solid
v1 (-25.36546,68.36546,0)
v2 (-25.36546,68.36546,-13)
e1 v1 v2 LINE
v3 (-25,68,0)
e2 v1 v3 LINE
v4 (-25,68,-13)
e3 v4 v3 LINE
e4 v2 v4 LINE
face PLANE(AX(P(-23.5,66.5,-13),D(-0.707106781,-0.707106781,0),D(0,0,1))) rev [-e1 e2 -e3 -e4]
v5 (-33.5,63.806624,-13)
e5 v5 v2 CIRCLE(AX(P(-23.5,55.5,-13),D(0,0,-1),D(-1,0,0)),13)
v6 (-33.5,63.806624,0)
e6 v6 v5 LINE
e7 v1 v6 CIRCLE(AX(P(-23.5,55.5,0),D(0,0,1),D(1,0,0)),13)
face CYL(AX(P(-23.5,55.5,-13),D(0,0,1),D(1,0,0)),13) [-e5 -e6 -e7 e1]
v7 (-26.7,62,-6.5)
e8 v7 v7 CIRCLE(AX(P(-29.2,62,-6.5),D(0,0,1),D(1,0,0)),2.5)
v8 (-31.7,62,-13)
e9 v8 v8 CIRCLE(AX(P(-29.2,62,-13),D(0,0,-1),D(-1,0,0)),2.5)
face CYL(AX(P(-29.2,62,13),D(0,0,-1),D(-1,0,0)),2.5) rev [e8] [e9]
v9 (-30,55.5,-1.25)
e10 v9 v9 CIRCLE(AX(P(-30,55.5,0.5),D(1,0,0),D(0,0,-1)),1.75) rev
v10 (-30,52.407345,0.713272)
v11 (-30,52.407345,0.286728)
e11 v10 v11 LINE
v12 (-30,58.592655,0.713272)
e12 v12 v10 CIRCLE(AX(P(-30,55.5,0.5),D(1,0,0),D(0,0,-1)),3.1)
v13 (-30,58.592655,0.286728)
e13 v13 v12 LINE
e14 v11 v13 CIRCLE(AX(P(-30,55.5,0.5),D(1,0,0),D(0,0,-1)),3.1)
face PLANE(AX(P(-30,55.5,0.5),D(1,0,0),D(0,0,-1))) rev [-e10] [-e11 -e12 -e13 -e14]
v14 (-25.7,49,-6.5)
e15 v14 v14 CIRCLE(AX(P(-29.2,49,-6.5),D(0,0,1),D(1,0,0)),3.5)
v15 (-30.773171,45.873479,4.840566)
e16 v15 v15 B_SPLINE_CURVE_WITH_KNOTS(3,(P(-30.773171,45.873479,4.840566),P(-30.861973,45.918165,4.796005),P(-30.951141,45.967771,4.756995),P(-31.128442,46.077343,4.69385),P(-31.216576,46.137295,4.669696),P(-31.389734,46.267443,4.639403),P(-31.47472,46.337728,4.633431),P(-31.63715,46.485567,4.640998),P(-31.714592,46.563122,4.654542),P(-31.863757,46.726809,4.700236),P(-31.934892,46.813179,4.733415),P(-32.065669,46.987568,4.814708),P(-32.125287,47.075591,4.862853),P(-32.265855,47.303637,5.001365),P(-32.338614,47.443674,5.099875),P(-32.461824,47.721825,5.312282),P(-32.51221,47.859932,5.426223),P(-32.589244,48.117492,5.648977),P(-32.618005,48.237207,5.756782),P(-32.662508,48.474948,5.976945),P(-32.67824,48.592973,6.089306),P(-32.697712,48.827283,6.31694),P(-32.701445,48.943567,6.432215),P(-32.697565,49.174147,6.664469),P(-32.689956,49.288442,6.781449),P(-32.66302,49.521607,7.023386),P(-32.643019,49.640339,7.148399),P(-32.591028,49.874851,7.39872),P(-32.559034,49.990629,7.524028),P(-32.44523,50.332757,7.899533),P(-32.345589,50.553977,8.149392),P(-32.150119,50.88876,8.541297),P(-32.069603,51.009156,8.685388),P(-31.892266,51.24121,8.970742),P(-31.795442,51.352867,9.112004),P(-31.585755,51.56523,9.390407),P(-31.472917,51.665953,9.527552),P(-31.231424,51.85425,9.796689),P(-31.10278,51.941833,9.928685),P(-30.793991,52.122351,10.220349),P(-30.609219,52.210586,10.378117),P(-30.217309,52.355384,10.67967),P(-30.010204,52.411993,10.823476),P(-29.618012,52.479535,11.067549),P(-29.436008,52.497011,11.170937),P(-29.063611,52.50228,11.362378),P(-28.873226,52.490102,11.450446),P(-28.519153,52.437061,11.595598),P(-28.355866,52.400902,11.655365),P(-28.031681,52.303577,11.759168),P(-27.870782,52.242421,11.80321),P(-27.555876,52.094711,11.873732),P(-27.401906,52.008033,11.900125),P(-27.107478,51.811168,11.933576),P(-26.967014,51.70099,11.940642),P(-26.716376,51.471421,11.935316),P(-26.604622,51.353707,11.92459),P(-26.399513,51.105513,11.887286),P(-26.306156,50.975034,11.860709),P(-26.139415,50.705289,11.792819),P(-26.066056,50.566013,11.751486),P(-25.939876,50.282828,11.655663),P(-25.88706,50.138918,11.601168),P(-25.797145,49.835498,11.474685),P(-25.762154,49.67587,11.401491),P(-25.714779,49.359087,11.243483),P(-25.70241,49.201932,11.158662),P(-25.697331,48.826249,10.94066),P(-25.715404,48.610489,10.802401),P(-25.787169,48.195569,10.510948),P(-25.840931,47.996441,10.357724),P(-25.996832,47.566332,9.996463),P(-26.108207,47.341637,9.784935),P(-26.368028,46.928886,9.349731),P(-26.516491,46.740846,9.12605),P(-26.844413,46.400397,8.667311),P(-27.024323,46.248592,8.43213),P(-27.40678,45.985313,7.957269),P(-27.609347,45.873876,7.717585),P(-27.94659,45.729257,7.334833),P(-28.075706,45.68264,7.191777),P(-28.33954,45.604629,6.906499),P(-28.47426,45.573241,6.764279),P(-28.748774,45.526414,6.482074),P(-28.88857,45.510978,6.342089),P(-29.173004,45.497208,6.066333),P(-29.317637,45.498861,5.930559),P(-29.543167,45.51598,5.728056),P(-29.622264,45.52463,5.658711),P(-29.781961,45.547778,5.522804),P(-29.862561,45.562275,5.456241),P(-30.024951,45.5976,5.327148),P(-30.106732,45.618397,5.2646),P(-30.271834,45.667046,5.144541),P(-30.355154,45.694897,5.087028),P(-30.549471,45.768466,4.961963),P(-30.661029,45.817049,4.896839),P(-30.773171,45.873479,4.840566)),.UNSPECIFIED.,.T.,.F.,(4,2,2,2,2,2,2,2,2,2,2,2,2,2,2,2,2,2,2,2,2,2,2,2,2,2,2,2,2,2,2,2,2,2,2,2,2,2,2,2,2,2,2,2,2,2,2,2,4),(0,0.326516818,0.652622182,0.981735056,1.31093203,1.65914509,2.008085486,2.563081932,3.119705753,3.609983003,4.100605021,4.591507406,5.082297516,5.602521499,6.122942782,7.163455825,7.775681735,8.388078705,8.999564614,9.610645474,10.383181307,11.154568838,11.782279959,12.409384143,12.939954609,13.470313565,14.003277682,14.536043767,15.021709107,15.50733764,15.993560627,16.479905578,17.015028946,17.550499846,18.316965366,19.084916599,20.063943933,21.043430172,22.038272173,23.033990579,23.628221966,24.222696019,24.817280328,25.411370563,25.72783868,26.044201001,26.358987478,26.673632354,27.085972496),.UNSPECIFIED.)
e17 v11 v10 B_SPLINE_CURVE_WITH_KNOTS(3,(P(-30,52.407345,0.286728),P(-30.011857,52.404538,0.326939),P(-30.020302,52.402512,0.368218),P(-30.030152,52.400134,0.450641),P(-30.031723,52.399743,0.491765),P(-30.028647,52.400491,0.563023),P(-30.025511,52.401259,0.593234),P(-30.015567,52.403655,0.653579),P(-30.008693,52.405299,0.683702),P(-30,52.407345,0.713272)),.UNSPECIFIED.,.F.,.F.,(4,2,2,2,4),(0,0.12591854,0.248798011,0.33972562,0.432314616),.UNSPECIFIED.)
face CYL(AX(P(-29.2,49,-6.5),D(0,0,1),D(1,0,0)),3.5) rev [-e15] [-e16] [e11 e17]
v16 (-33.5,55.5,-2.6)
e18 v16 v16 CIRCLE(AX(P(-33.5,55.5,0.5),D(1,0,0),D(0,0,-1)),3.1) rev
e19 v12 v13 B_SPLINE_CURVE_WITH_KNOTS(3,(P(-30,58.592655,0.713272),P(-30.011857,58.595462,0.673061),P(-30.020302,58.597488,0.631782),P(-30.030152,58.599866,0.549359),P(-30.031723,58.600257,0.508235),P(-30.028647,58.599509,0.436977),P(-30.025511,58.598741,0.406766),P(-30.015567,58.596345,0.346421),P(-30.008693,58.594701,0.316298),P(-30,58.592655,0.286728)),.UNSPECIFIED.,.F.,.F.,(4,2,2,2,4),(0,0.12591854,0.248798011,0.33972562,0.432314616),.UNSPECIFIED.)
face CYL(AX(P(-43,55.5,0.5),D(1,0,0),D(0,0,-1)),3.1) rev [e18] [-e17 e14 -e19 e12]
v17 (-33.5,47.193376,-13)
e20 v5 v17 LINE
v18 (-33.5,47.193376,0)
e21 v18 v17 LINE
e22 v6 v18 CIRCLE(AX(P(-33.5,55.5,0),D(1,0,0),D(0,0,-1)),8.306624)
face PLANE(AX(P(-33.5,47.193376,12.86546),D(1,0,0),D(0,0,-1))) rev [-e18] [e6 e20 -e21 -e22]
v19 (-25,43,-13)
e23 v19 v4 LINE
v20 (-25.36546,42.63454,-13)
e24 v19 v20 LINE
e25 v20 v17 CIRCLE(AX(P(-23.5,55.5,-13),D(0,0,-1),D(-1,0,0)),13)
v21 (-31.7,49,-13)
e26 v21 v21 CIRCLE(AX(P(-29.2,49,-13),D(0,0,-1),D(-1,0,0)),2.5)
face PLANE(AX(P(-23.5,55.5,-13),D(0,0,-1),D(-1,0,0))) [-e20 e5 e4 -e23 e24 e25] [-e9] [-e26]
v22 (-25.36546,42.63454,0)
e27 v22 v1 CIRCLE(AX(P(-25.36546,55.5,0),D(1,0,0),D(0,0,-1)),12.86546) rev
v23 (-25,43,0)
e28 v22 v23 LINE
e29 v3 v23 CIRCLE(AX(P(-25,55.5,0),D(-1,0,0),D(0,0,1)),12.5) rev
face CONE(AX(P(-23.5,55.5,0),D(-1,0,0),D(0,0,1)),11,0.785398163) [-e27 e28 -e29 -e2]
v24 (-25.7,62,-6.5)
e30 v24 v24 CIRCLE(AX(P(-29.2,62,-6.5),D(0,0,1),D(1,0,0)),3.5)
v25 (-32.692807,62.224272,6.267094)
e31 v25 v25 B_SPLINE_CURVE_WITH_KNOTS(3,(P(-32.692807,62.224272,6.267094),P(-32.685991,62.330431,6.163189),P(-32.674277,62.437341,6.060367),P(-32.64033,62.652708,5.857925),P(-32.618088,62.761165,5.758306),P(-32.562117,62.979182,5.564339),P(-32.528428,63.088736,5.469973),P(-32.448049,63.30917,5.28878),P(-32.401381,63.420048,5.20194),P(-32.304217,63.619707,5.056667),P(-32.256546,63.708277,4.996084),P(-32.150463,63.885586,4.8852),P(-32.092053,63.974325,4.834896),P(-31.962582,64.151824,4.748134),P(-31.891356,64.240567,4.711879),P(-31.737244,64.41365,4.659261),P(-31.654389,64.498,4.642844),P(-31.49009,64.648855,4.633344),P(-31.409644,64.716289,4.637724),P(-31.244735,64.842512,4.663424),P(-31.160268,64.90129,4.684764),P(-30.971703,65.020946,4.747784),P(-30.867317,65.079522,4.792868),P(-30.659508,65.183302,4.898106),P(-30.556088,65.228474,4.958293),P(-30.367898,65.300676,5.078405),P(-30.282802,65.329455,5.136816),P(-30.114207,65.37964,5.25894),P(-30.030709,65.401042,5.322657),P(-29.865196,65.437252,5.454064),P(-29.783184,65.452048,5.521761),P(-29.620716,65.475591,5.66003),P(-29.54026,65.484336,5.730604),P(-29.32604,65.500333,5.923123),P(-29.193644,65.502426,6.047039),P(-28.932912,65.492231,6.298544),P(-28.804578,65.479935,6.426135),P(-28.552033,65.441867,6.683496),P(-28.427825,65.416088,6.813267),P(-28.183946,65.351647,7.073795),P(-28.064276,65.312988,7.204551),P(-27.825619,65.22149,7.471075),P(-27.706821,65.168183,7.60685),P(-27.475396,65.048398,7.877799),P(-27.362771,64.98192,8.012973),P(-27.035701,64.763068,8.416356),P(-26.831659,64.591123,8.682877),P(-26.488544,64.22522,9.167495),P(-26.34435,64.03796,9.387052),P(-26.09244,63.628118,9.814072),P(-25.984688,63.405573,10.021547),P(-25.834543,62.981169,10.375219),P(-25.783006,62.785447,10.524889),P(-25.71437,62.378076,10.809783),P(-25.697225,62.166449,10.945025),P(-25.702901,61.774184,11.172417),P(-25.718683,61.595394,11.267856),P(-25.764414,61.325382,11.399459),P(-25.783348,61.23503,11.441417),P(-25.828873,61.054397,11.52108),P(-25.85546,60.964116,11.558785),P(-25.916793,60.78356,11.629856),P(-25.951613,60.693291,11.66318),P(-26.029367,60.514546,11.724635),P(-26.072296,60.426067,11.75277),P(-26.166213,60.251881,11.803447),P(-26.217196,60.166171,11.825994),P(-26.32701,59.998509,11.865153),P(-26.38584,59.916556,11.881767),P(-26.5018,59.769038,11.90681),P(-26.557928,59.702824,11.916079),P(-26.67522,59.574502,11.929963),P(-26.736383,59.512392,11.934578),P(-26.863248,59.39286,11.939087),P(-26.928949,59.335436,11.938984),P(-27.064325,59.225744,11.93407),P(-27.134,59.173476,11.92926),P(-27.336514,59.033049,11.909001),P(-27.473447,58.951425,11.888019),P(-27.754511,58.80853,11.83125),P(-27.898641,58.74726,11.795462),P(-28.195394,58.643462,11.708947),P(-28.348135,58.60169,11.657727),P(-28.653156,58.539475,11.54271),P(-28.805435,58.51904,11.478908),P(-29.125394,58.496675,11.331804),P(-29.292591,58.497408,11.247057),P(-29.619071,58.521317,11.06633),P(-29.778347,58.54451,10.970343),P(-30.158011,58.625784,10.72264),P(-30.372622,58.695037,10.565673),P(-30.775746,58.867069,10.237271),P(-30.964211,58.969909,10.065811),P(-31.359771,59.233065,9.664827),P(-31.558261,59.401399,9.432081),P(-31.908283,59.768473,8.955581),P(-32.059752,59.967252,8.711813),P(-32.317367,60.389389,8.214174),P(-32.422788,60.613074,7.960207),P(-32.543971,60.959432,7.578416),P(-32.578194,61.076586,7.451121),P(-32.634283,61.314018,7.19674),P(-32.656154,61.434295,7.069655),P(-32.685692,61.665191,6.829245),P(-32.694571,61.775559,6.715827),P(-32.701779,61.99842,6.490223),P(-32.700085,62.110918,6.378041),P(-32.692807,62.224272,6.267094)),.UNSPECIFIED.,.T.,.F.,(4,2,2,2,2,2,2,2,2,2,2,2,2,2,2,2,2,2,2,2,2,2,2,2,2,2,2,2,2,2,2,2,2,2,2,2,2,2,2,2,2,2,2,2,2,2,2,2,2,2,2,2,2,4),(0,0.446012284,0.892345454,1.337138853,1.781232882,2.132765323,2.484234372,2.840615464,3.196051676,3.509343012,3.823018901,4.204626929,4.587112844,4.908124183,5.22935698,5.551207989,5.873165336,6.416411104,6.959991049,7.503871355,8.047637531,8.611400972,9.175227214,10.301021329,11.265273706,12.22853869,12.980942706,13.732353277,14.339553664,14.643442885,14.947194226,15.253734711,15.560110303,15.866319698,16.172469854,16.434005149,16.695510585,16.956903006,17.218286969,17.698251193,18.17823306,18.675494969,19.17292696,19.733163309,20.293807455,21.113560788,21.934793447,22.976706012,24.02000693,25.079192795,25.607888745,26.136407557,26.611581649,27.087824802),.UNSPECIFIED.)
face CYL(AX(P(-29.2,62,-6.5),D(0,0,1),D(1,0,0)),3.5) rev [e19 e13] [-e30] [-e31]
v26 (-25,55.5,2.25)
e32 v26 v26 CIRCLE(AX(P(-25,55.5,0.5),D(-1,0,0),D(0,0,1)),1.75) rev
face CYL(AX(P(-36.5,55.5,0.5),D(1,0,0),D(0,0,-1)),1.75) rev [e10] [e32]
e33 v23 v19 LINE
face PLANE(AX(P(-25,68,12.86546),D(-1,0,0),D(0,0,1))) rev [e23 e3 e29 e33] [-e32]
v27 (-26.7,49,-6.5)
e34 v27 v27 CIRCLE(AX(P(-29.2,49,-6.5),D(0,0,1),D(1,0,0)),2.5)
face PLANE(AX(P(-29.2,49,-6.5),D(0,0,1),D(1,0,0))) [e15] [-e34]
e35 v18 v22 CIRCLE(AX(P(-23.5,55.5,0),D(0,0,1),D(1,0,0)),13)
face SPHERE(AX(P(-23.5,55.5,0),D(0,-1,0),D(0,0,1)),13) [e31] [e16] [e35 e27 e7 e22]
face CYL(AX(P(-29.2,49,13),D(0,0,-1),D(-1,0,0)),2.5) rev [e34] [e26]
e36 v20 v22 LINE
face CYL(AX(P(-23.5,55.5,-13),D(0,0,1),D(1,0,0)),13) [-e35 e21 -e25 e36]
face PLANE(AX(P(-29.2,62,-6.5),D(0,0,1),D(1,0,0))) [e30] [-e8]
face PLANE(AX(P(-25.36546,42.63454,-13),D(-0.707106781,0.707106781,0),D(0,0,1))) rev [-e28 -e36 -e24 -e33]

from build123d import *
from build123d.topology import SkipClean

# Parameters (mm, degrees)
REVOLU_O1_ANGLE            = 90
ESBO_O3_R                  = 2.5
CORTE_EXTRUS_O1_DEPTH      = 79.698792875
RESSALTO_EXTRUS_O1_START   = 13
ESBO_O7_R                  = 2.5
RESSALTO_EXTRUS_O1_DEPTH   = 13
CORTE_EXTRUS_O3_DEPTH      = 79.698792875
CORTE_EXTRUS_O3_DEPTH_BACK = 6.5
ESBO_O4_R                  = 3.5
ESBO_O6_R                  = 1.75
CORTE_EXTRUS_O4_DEPTH      = 71.924255371
CORTE_EXTRUS_O5_START      = -6.5
ESBO_O8_R                  = 3.1
CORTE_EXTRUS_O5_DEPTH      = 13
CHANFRO1_SIZE              = 2
CORTE_EXTRUS_O6_DEPTH      = 82.701335058
CORTE_EXTRUS_O7_DEPTH      = 81.405896153


with BuildPart() as part:
    # Esboço2 → Revolução1 (revolve)
    with BuildSketch(Plane.XY):
        with BuildLine():
            Line((-23.5, 42.5), (-23.5, 68.5))
            ThreePointArc((-23.5, 68.5), (-36.5, 55.5), (-23.5, 42.5))
        make_face()
    revolve(axis=Axis((-23.5, 42.5, 0), (0, 1, 0)), revolution_arc=REVOLU_O1_ANGLE)

    # Esboço3 → Corte-extrusão1 (cut, through all)
    with BuildSketch(Plane.XY):
        with Locations(Location((-29.2, 62, 0), (0, 0, 142.736397609))):
            Circle(ESBO_O3_R)
        with Locations(Location((-29.2, 49, 0), (0, 0, 233.94500715))):
            Circle(ESBO_O3_R)
    extrude(amount=CORTE_EXTRUS_O1_DEPTH, mode=Mode.SUBTRACT)

    # Esboço7 → Ressalto-extrusão1 (add)
    with SkipClean():  # the faces are left unmerged after this step: merging them gives an invalid solid
        with BuildSketch(Plane(origin=(0, 0, 0), x_dir=(-1, 0, 0), z_dir=(0, 0, -1)).offset(RESSALTO_EXTRUS_O1_START)):
            with BuildLine():
                Line((23.5, 68.5), (23.5, 42.5))
                ThreePointArc((23.5, 42.5), (36.5, 55.5), (23.5, 68.5))
            make_face()
            with Locations((29.2, 62)):
                Circle(ESBO_O7_R, mode=Mode.SUBTRACT)
            with Locations((29.2, 49)):
                Circle(ESBO_O7_R, mode=Mode.SUBTRACT)
        extrude(amount=-RESSALTO_EXTRUS_O1_DEPTH)

    # Esboço4 → Corte-extrusão3 (cut, two sides: drawn at the far end of the back side and taken through both)
    with BuildSketch(Plane.XY.offset(-CORTE_EXTRUS_O3_DEPTH_BACK)):
        with Locations((-29.2, 62)):
            Circle(ESBO_O4_R)
        with Locations((-29.2, 49)):
            Circle(ESBO_O4_R)
    extrude(amount=CORTE_EXTRUS_O3_DEPTH + CORTE_EXTRUS_O3_DEPTH_BACK, mode=Mode.SUBTRACT)

    # Esboço6 → Corte-extrusão4 (cut, through all)
    with BuildSketch(Plane(origin=(-23.5, 0, 0), x_dir=(0, 0, -1), z_dir=(1, 0, 0))):
        with Locations((-0.5, 55.5)):
            Circle(ESBO_O6_R)
    extrude(amount=-CORTE_EXTRUS_O4_DEPTH, mode=Mode.SUBTRACT)

    # Esboço8 → Corte-extrusão5 (cut)
    with BuildSketch(Plane(origin=(-23.5, 0, 0), x_dir=(0, 0, -1), z_dir=(1, 0, 0)).offset(CORTE_EXTRUS_O5_START)):
        with Locations(Location((-0.5, 55.5, 0), (0, 0, 279.281799091))):
            Circle(ESBO_O8_R)
    extrude(amount=-CORTE_EXTRUS_O5_DEPTH, mode=Mode.SUBTRACT)

    # Chanfro1
    # the kernel refuses this chamfer: 2 mm, written as the material it takes off along each edge
    with BuildSketch(Plane(origin=(-23.5, 42.5, -18.143365976), x_dir=(-0.9974093352150653, 0.07193481789677074, 0), z_dir=(0, 0, 1))) as chanfro1_piece_1:
        with BuildLine():
            Line((1.870305265, 0), (CHANFRO1_SIZE * 0.0719348178968, -CHANFRO1_SIZE * 0.997409335215))
            Line((CHANFRO1_SIZE * 0.0719348178968, -CHANFRO1_SIZE * 0.997409335215), (0, 0))
            ThreePointArc((0, 0), (0.961335866, 0.033652274), (1.870305265, 0))
        make_face()
    extrude(amount=18.143365976, mode=Mode.SUBTRACT)
    with BuildSketch(Plane(origin=(-23.5, 68.5, -18.143365976), x_dir=(-0.9974093352150653, -0.07193481789677116, 0), z_dir=(0, 0, 1))) as chanfro1_piece_2:
        with BuildLine():
            Line((1.870305265, 0), (CHANFRO1_SIZE * 0.0719348178968, CHANFRO1_SIZE * 0.997409335215))
            Line((CHANFRO1_SIZE * 0.0719348178968, CHANFRO1_SIZE * 0.997409335215), (0, 0))
            ThreePointArc((0, 0), (0.961335866, -0.033652274), (1.870305265, 0))
        make_face()
    extrude(amount=18.143365976, mode=Mode.SUBTRACT)
    with BuildSketch(Plane(origin=(-23.5, 55.5, 0), x_dir=(0, 1, 0), z_dir=(0, 0, -1))) as chanfro1_piece_3:
        with BuildLine():
            Line((12.865459931, -1.865459931), (13 - CHANFRO1_SIZE, 0))
            Line((13 - CHANFRO1_SIZE, 0), (13, 0))
            ThreePointArc((13, 0), (12.964411572, -0.961266138), (12.865459931, -1.865459931))
        make_face()
    revolve(axis=Axis((-23.5, 55.5, 0), (1, 0, 0)), revolution_arc=180, mode=Mode.SUBTRACT)

    # Esboço9 → Corte-extrusão6 (cut, through all)
    with BuildSketch(Plane(origin=(0, 0, -13), x_dir=(-1, 0, 0), z_dir=(0, 0, -1))):
        with BuildLine():
            Line((33.5, 47.193376137), (33.5, 63.806623863))
            ThreePointArc((33.5, 63.806623863), (36.5, 55.5), (33.5, 47.193376137))
        make_face()
    extrude(amount=-CORTE_EXTRUS_O6_DEPTH, mode=Mode.SUBTRACT)

    # Esboço10 → Corte-extrusão7 (cut, through all)
    with BuildSketch(Plane(origin=(0, 0, -13), x_dir=(-1, 0, 0), z_dir=(0, 0, -1))):
        Polygon((25, 68), (25, 43), (23.5, 44.5), (23.5, 66.5), align=None)
    extrude(amount=-CORTE_EXTRUS_O7_DEPTH, mode=Mode.SUBTRACT)


solid = part.part
